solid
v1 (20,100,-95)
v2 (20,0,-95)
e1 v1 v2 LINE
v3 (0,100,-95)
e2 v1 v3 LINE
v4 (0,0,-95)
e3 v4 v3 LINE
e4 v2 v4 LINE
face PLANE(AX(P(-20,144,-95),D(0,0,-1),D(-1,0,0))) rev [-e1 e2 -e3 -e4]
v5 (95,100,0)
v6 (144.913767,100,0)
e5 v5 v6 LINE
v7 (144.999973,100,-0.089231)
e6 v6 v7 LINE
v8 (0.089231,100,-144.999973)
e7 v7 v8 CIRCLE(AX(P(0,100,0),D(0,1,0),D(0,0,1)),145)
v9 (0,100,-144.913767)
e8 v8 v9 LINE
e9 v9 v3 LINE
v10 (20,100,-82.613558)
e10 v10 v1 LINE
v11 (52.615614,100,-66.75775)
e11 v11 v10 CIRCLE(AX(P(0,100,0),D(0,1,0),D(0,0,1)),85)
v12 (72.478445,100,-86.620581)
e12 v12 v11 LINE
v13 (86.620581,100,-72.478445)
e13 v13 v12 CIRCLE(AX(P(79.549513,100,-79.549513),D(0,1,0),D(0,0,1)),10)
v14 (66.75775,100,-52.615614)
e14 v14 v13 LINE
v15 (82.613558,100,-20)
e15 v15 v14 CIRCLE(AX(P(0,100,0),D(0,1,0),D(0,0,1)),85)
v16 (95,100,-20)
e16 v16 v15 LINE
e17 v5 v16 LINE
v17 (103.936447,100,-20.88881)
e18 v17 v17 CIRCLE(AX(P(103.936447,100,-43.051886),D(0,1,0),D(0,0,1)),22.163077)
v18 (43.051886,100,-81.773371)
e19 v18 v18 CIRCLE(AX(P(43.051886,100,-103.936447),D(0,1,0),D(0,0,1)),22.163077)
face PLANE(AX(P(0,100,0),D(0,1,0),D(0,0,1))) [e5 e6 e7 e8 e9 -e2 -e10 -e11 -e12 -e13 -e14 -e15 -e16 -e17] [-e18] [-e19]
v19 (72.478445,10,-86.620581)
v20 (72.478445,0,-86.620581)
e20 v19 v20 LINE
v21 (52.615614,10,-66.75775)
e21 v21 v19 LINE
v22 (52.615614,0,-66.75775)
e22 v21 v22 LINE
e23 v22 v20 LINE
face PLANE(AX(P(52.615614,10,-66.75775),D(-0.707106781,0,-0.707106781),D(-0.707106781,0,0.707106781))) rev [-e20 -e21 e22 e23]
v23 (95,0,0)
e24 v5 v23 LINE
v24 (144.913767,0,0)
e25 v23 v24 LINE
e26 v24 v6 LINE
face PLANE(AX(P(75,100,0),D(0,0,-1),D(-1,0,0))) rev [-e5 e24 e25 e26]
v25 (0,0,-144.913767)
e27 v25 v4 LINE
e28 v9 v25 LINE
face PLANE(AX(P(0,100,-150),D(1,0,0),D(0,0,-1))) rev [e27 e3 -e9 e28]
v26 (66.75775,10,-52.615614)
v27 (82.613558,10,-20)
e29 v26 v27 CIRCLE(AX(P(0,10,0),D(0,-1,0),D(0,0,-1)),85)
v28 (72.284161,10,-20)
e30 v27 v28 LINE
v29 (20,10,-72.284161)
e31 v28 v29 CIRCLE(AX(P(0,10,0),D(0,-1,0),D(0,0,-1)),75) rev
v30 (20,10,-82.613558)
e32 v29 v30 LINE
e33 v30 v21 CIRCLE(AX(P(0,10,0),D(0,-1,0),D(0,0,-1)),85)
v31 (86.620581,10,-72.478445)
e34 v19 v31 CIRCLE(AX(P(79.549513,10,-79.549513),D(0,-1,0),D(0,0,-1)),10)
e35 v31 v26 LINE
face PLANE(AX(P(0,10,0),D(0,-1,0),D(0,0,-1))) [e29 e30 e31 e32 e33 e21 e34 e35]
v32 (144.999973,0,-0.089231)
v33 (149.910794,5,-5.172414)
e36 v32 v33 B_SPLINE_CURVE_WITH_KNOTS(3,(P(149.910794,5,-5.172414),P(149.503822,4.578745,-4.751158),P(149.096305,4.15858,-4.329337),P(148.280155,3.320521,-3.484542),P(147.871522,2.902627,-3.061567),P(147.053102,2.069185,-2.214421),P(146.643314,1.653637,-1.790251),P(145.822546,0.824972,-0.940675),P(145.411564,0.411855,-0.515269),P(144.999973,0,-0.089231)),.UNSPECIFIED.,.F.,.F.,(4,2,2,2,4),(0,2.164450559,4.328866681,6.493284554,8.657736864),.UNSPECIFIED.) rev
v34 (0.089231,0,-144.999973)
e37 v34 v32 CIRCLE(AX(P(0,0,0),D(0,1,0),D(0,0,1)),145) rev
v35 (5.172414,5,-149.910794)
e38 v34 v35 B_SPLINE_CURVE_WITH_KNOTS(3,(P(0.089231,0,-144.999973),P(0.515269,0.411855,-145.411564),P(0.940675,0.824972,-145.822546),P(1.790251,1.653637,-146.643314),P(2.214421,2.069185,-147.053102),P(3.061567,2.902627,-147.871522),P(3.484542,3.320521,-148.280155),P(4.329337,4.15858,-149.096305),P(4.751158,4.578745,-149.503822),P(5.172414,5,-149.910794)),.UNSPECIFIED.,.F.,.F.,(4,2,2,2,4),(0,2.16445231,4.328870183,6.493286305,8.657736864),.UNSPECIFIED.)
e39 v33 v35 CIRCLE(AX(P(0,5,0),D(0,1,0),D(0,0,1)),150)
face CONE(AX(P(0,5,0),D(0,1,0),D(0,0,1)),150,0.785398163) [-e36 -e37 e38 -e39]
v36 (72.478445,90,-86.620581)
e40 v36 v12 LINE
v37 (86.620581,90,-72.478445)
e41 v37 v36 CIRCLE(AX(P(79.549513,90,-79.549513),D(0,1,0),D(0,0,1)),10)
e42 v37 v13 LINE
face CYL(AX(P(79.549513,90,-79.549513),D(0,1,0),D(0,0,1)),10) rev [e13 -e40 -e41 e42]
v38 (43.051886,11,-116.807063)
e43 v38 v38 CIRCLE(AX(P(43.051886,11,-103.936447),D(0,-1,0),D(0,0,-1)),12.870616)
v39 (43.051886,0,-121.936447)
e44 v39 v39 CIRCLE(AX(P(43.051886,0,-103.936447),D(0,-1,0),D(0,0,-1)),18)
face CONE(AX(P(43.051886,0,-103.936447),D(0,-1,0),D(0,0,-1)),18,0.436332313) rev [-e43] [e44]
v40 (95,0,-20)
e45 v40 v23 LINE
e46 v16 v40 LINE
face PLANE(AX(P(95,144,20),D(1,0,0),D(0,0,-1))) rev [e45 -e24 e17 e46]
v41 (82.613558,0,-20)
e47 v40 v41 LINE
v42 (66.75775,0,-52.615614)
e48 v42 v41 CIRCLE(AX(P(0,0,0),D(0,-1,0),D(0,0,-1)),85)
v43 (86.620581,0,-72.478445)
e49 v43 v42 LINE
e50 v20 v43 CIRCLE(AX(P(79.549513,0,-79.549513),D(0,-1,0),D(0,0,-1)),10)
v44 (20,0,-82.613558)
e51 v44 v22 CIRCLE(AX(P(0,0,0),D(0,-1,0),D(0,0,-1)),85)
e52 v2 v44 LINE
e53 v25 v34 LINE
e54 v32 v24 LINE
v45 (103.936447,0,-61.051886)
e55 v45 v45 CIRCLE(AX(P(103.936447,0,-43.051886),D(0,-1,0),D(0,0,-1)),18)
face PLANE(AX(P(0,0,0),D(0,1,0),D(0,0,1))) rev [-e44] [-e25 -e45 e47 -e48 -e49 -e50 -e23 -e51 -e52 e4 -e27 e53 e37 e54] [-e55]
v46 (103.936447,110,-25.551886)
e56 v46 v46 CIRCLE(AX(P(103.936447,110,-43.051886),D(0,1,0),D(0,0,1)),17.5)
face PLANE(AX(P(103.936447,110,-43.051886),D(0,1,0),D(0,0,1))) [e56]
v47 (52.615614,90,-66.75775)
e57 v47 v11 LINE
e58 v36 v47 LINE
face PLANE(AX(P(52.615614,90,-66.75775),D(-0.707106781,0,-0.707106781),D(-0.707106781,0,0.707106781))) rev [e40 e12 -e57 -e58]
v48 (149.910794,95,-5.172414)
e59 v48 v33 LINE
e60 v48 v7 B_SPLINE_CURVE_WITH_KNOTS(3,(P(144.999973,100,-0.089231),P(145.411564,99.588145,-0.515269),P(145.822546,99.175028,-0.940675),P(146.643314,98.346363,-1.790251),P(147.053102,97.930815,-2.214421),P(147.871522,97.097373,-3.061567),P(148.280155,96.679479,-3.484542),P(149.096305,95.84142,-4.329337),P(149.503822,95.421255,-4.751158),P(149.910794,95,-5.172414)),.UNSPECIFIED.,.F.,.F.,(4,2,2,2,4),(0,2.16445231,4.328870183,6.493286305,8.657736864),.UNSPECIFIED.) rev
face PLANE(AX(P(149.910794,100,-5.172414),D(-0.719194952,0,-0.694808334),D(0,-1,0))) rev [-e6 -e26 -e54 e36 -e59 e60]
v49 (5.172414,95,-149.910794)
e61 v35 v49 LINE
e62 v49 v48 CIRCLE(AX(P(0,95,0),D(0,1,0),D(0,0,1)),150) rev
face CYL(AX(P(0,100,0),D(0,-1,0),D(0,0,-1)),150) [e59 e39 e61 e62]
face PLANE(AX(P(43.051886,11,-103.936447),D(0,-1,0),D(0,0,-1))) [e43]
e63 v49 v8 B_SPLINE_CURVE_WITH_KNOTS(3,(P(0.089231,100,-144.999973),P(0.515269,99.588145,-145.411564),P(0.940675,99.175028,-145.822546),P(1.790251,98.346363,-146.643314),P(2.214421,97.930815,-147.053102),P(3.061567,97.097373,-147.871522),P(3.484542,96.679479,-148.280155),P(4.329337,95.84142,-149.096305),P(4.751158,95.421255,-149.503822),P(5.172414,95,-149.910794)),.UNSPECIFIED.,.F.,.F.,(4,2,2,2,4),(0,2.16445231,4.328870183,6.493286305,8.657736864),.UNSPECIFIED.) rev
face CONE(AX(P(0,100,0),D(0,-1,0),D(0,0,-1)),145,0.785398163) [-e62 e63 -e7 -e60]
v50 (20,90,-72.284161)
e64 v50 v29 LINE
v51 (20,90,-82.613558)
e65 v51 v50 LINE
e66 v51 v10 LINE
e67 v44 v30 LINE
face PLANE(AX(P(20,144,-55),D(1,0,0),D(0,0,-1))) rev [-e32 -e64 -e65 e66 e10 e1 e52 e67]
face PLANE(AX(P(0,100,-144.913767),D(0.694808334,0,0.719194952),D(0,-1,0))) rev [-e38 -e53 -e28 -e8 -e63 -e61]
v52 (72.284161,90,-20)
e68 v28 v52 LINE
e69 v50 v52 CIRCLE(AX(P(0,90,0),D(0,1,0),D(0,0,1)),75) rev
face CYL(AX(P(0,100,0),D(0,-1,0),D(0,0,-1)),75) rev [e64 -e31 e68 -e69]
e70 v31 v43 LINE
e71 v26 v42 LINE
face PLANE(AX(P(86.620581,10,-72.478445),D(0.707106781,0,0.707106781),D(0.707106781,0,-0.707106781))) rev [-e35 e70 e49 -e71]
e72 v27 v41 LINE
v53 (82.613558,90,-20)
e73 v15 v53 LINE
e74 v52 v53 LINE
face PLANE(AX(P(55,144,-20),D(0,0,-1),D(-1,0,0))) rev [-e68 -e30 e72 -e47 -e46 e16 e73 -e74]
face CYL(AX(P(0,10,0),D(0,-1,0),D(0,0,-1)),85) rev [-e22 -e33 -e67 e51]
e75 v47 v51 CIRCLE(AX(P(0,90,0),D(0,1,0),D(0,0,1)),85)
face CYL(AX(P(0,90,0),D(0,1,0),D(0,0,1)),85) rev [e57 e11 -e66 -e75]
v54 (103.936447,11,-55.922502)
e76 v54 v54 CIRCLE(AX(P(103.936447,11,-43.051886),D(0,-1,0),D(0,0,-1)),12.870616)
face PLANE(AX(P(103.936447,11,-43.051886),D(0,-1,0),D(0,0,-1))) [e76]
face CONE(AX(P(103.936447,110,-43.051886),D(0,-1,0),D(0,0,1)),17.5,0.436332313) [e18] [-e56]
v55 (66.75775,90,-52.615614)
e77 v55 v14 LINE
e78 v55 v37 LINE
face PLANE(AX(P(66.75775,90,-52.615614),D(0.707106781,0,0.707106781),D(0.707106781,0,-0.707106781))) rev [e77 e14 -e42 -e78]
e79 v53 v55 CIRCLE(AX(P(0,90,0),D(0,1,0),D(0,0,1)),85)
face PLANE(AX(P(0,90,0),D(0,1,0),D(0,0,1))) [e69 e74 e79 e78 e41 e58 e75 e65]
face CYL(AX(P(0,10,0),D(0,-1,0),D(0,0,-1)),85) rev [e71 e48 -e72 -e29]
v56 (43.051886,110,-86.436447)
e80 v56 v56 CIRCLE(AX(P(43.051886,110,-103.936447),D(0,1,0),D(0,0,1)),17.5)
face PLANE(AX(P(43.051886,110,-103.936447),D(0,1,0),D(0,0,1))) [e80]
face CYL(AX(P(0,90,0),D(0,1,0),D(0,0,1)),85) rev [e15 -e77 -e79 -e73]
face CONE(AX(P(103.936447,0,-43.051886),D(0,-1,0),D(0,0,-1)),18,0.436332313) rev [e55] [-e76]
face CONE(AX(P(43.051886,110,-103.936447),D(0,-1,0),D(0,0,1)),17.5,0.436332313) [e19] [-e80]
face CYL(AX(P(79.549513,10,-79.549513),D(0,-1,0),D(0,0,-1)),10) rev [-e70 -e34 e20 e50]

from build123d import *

# Parameters (mm, degrees)
BOSS_EXTRUDE1_DEPTH           = 100
SKETCH3_R                     = 17.5
BOSS_EXTRUDE3_DEPTH           = 10
BOSS_EXTRUDE3_DRAFT           = 25
BOSS_EXTRUDE3_PROFILE_2_DEPTH = 10
BOSS_EXTRUDE3_PROFILE_2_DRAFT = 25
SKETCH4_R                     = 18
CUT_EXTRUDE1_DEPTH            = 11
CUT_EXTRUDE1_DRAFT            = -25
CUT_EXTRUDE1_PROFILE_2_DEPTH  = 11
CUT_EXTRUDE1_PROFILE_2_DRAFT  = -25
SKETCH5_W                     = 40
SKETCH5_H                     = 40
CUT_EXTRUDE2_DEPTH            = 144
SKETCH6_R                     = 85
CUT_EXTRUDE3_DEPTH            = 10
CUT_EXTRUDE4_START            = -10
SKETCH7_R                     = 85
CUT_EXTRUDE4_DEPTH            = 10
CUT_EXTRUDE5_DEPTH            = 10
CUT_EXTRUDE6_START            = -10
CUT_EXTRUDE6_DEPTH            = 10


with BuildPart() as part:
    # Sketch1 → Boss-Extrude1 (new body)
    with BuildSketch(Plane(origin=(0, 0, 0), x_dir=(1, 0, 0), z_dir=(0, 1, 0))):
        with BuildLine():
            Line((0, 150), (0, 75))
            ThreePointArc((0, 75), (53.033008589, 53.033008589), (75, 0))
            Line((75, 0), (150, 0))
            ThreePointArc((150, 0), (106.066017178, 106.066017178), (0, 150))
        make_face()
    extrude(amount=BOSS_EXTRUDE1_DEPTH)


with BuildPart() as boss_extrude3_tool:
    # Sketch3 → Boss-Extrude3 (with draft: the straight prism first)
    with BuildSketch(Plane(origin=(0, 110, 0), x_dir=(1, 0, 0), z_dir=(0, 1, 0))):
        with Locations((43.051886141, 103.936447408)):
            Circle(SKETCH3_R)
    extrude(amount=-BOSS_EXTRUDE3_DEPTH)
    # Boss-Extrude3: the draft: its side faces are tilted about the plane it starts from
    boss_extrude3_sides = [boss_extrude3_tool.faces().sort_by_distance(p)[0] for p in [
        (25.551886141, 105, -103.936447408),
    ]]
    draft(boss_extrude3_sides, Plane(origin=(0, 110, 0), x_dir=(1, 0, 0), z_dir=(0, 1, 0)), BOSS_EXTRUDE3_DRAFT)


with BuildPart() as part_1:
    add(part.part)

    # Boss-Extrude3: add boss_extrude3_tool
    add(boss_extrude3_tool.part)


with BuildPart() as boss_extrude3_profile_2_tool:
    # Sketch3 → Boss-Extrude3 profile 2 (with draft: the straight prism first)
    with BuildSketch(Plane(origin=(0, 110, 0), x_dir=(1, 0, 0), z_dir=(0, 1, 0))):
        with Locations((103.936447408, 43.051886141)):
            Circle(SKETCH3_R)
    extrude(amount=-BOSS_EXTRUDE3_PROFILE_2_DEPTH)
    # Boss-Extrude3 profile 2: the draft: its side faces are tilted about the plane it starts from
    boss_extrude3_profile_2_sides = [boss_extrude3_profile_2_tool.faces().sort_by_distance(p)[0] for p in [
        (86.436447408, 105, -43.051886141),
    ]]
    draft(boss_extrude3_profile_2_sides, Plane(origin=(0, 110, 0), x_dir=(1, 0, 0), z_dir=(0, 1, 0)), BOSS_EXTRUDE3_PROFILE_2_DRAFT)


with BuildPart() as part_2:
    add(part_1.part)

    # Boss-Extrude3 profile 2: add boss_extrude3_profile_2_tool
    add(boss_extrude3_profile_2_tool.part)


with BuildPart() as cut_extrude1_tool:
    # Sketch4 → Cut-Extrude1 (with draft: the straight prism first)
    with BuildSketch(Plane.XZ):
        with Locations((103.936447408, -43.051886141)):
            Circle(SKETCH4_R)
    extrude(amount=-CUT_EXTRUDE1_DEPTH)
    # Cut-Extrude1: the draft: its side faces are tilted about the plane it starts from
    cut_extrude1_sides = [cut_extrude1_tool.faces().sort_by_distance(p)[0] for p in [
        (85.936447408, 5.5, -43.051886141),
    ]]
    draft(cut_extrude1_sides, Plane.XZ, CUT_EXTRUDE1_DRAFT)


with BuildPart() as part_3:
    add(part_2.part)

    # Cut-Extrude1: cut by cut_extrude1_tool
    add(cut_extrude1_tool.part, mode=Mode.SUBTRACT)


with BuildPart() as cut_extrude1_profile_2_tool:
    # Sketch4 → Cut-Extrude1 profile 2 (with draft: the straight prism first)
    with BuildSketch(Plane.XZ):
        with Locations((43.051886141, -103.936447408)):
            Circle(SKETCH4_R)
    extrude(amount=-CUT_EXTRUDE1_PROFILE_2_DEPTH)
    # Cut-Extrude1 profile 2: the draft: its side faces are tilted about the plane it starts from
    cut_extrude1_profile_2_sides = [cut_extrude1_profile_2_tool.faces().sort_by_distance(p)[0] for p in [
        (25.051886141, 5.5, -103.936447408),
    ]]
    draft(cut_extrude1_profile_2_sides, Plane.XZ, CUT_EXTRUDE1_PROFILE_2_DRAFT)


with BuildPart() as part_4:
    add(part_3.part)

    # Cut-Extrude1 profile 2: cut by cut_extrude1_profile_2_tool
    add(cut_extrude1_profile_2_tool.part, mode=Mode.SUBTRACT)

    # Sketch5 → Cut-Extrude2 (cut)
    with BuildSketch(Plane.XZ):
        with Locations((0, -75)):
            Rectangle(SKETCH5_W, SKETCH5_H)
        with Locations((75, 0)):
            Rectangle(SKETCH5_W, SKETCH5_H)
    extrude(amount=-CUT_EXTRUDE2_DEPTH, mode=Mode.SUBTRACT)

    # Chamfer1
    # the kernel refuses this chamfer: 5 mm, written as the material it takes off along each edge
    with BuildSketch(Plane(origin=(0, 100, 0), x_dir=(0.9963251041879452, 0, 0.08565212644692502), z_dir=(-0.08565212644692502, 0, 0.9963251041879452))) as chamfer1_piece_1:
        with BuildLine():
            Line((150.141421356, -5.141421356), (144.858578644, 0.141421356))
            Line((144.858578644, 0.141421356), (144.858578644, 0.241421356))
            ThreePointArc((144.858578644, 0.241421356), (147.429289322, 0.1), (150, 0.1))
            Line((150, 0.1), (150.1, 0))
            ThreePointArc((150.1, 0), (150.1, -2.570710678), (150.241421356, -5.141421356))
            Line((150.241421356, -5.141421356), (150.141421356, -5.141421356))
        make_face()
    revolve(axis=Axis((0, 100, 0), (0, 1, 0)), revolution_arc=99.827051452, mode=Mode.SUBTRACT)
    with BuildSketch(Plane(origin=(0, 0, 0), x_dir=(0.9963251041879452, 0, 0.08565212644692488), z_dir=(-0.08565212644692488, 0, 0.9963251041879452))) as chamfer1_piece_2:
        with BuildLine():
            Line((150.141421356, 5.141421356), (144.858578644, -0.141421356))
            Line((144.858578644, -0.141421356), (144.858578644, -0.241421356))
            ThreePointArc((144.858578644, -0.241421356), (147.429289322, -0.1), (150, -0.1))
            Line((150, -0.1), (150.1, 0))
            ThreePointArc((150.1, 0), (150.1, 2.570710678), (150.241421356, 5.141421356))
            Line((150.241421356, 5.141421356), (150.141421356, 5.141421356))
        make_face()
    revolve(axis=Axis((0, 0, 0), (0, 1, 0)), revolution_arc=99.827051452, mode=Mode.SUBTRACT)
    with BuildSketch(Plane(origin=(150, -13.291214034, 0), x_dir=(0.009358737420086232, 0, -0.9999562060579963), z_dir=(0, 1, 0))) as chamfer1_piece_3:
        with BuildLine():
            Line((5.316485613, 0), (-0.192733912, 5.223619222))
            Line((-0.192733912, 5.223619222), (-0.292729532, 5.222683348))
            ThreePointArc((-0.292729532, 5.222683348), (-0.124446231, 2.611546813), (-0.099995621, -0.000935874))
            Line((-0.099995621, -0.000935874), (0.000935874, -0.099995621))
            ThreePointArc((0.000935874, -0.099995621), (2.659639048, -0.051556934), (5.320869055, -0.099903881))
            Line((5.320869055, -0.099903881), (5.316485613, 0))
        make_face()
    extrude(amount=126.582428067, mode=Mode.SUBTRACT)
    with BuildSketch(Plane(origin=(0, -13.291214034, -150), x_dir=(0.9999562060579963, 0, -0.009358737420086213), z_dir=(0, 1, 0))) as chamfer1_piece_4:
        with BuildLine():
            Line((5.316485613, 0), (-0.192733912, -5.223619222))
            Line((-0.192733912, -5.223619222), (-0.292729532, -5.222683348))
            ThreePointArc((-0.292729532, -5.222683348), (-0.124446231, -2.611546813), (-0.099995621, 0.000935874))
            Line((-0.099995621, 0.000935874), (0.000935874, 0.099995621))
            ThreePointArc((0.000935874, 0.099995621), (2.659639048, 0.051556934), (5.320869055, 0.099903881))
            Line((5.320869055, 0.099903881), (5.316485613, 0))
        make_face()
    extrude(amount=126.582428067, mode=Mode.SUBTRACT)

    # Sketch6 → Cut-Extrude3 (cut)
    with BuildSketch(Plane(origin=(0, 100, 0), x_dir=(1, 0, 0), z_dir=(0, 1, 0))):
        Circle(SKETCH6_R)
    extrude(amount=-CUT_EXTRUDE3_DEPTH, mode=Mode.SUBTRACT)

    # Sketch7 → Cut-Extrude4 (cut)
    with BuildSketch(Plane.XZ.offset(CUT_EXTRUDE4_START)):
        Circle(SKETCH7_R)
    extrude(amount=CUT_EXTRUDE4_DEPTH, mode=Mode.SUBTRACT)

    # Sketch8 → Cut-Extrude5 (cut)
    with BuildSketch(Plane(origin=(0, 100, 0), x_dir=(1, 0, 0), z_dir=(0, 1, 0))):
        with BuildLine():
            Line((66.757749743, 52.61561412), (86.620580695, 72.478445072))
            ThreePointArc((86.620580695, 72.478445072), (86.620580695, 86.620580695), (72.478445072, 86.620580695))
            Line((72.478445072, 86.620580695), (52.61561412, 66.757749743))
            ThreePointArc((52.61561412, 66.757749743), (60.104076401, 60.104076401), (66.757749743, 52.61561412))
        make_face()
    extrude(amount=-CUT_EXTRUDE5_DEPTH, mode=Mode.SUBTRACT)

    # Sketch10 → Cut-Extrude6 (cut)
    with BuildSketch(Plane.XZ.offset(CUT_EXTRUDE6_START)):
        with BuildLine():
            Line((86.620580695, -72.478445072), (66.757749743, -52.61561412))
            ThreePointArc((66.757749743, -52.61561412), (60.104076401, -60.104076401), (52.61561412, -66.757749743))
            Line((52.61561412, -66.757749743), (72.478445072, -86.620580695))
            ThreePointArc((72.478445072, -86.620580695), (86.620580695, -86.620580695), (86.620580695, -72.478445072))
        make_face()
    extrude(amount=CUT_EXTRUDE6_DEPTH, mode=Mode.SUBTRACT)


solid = part_4.part
